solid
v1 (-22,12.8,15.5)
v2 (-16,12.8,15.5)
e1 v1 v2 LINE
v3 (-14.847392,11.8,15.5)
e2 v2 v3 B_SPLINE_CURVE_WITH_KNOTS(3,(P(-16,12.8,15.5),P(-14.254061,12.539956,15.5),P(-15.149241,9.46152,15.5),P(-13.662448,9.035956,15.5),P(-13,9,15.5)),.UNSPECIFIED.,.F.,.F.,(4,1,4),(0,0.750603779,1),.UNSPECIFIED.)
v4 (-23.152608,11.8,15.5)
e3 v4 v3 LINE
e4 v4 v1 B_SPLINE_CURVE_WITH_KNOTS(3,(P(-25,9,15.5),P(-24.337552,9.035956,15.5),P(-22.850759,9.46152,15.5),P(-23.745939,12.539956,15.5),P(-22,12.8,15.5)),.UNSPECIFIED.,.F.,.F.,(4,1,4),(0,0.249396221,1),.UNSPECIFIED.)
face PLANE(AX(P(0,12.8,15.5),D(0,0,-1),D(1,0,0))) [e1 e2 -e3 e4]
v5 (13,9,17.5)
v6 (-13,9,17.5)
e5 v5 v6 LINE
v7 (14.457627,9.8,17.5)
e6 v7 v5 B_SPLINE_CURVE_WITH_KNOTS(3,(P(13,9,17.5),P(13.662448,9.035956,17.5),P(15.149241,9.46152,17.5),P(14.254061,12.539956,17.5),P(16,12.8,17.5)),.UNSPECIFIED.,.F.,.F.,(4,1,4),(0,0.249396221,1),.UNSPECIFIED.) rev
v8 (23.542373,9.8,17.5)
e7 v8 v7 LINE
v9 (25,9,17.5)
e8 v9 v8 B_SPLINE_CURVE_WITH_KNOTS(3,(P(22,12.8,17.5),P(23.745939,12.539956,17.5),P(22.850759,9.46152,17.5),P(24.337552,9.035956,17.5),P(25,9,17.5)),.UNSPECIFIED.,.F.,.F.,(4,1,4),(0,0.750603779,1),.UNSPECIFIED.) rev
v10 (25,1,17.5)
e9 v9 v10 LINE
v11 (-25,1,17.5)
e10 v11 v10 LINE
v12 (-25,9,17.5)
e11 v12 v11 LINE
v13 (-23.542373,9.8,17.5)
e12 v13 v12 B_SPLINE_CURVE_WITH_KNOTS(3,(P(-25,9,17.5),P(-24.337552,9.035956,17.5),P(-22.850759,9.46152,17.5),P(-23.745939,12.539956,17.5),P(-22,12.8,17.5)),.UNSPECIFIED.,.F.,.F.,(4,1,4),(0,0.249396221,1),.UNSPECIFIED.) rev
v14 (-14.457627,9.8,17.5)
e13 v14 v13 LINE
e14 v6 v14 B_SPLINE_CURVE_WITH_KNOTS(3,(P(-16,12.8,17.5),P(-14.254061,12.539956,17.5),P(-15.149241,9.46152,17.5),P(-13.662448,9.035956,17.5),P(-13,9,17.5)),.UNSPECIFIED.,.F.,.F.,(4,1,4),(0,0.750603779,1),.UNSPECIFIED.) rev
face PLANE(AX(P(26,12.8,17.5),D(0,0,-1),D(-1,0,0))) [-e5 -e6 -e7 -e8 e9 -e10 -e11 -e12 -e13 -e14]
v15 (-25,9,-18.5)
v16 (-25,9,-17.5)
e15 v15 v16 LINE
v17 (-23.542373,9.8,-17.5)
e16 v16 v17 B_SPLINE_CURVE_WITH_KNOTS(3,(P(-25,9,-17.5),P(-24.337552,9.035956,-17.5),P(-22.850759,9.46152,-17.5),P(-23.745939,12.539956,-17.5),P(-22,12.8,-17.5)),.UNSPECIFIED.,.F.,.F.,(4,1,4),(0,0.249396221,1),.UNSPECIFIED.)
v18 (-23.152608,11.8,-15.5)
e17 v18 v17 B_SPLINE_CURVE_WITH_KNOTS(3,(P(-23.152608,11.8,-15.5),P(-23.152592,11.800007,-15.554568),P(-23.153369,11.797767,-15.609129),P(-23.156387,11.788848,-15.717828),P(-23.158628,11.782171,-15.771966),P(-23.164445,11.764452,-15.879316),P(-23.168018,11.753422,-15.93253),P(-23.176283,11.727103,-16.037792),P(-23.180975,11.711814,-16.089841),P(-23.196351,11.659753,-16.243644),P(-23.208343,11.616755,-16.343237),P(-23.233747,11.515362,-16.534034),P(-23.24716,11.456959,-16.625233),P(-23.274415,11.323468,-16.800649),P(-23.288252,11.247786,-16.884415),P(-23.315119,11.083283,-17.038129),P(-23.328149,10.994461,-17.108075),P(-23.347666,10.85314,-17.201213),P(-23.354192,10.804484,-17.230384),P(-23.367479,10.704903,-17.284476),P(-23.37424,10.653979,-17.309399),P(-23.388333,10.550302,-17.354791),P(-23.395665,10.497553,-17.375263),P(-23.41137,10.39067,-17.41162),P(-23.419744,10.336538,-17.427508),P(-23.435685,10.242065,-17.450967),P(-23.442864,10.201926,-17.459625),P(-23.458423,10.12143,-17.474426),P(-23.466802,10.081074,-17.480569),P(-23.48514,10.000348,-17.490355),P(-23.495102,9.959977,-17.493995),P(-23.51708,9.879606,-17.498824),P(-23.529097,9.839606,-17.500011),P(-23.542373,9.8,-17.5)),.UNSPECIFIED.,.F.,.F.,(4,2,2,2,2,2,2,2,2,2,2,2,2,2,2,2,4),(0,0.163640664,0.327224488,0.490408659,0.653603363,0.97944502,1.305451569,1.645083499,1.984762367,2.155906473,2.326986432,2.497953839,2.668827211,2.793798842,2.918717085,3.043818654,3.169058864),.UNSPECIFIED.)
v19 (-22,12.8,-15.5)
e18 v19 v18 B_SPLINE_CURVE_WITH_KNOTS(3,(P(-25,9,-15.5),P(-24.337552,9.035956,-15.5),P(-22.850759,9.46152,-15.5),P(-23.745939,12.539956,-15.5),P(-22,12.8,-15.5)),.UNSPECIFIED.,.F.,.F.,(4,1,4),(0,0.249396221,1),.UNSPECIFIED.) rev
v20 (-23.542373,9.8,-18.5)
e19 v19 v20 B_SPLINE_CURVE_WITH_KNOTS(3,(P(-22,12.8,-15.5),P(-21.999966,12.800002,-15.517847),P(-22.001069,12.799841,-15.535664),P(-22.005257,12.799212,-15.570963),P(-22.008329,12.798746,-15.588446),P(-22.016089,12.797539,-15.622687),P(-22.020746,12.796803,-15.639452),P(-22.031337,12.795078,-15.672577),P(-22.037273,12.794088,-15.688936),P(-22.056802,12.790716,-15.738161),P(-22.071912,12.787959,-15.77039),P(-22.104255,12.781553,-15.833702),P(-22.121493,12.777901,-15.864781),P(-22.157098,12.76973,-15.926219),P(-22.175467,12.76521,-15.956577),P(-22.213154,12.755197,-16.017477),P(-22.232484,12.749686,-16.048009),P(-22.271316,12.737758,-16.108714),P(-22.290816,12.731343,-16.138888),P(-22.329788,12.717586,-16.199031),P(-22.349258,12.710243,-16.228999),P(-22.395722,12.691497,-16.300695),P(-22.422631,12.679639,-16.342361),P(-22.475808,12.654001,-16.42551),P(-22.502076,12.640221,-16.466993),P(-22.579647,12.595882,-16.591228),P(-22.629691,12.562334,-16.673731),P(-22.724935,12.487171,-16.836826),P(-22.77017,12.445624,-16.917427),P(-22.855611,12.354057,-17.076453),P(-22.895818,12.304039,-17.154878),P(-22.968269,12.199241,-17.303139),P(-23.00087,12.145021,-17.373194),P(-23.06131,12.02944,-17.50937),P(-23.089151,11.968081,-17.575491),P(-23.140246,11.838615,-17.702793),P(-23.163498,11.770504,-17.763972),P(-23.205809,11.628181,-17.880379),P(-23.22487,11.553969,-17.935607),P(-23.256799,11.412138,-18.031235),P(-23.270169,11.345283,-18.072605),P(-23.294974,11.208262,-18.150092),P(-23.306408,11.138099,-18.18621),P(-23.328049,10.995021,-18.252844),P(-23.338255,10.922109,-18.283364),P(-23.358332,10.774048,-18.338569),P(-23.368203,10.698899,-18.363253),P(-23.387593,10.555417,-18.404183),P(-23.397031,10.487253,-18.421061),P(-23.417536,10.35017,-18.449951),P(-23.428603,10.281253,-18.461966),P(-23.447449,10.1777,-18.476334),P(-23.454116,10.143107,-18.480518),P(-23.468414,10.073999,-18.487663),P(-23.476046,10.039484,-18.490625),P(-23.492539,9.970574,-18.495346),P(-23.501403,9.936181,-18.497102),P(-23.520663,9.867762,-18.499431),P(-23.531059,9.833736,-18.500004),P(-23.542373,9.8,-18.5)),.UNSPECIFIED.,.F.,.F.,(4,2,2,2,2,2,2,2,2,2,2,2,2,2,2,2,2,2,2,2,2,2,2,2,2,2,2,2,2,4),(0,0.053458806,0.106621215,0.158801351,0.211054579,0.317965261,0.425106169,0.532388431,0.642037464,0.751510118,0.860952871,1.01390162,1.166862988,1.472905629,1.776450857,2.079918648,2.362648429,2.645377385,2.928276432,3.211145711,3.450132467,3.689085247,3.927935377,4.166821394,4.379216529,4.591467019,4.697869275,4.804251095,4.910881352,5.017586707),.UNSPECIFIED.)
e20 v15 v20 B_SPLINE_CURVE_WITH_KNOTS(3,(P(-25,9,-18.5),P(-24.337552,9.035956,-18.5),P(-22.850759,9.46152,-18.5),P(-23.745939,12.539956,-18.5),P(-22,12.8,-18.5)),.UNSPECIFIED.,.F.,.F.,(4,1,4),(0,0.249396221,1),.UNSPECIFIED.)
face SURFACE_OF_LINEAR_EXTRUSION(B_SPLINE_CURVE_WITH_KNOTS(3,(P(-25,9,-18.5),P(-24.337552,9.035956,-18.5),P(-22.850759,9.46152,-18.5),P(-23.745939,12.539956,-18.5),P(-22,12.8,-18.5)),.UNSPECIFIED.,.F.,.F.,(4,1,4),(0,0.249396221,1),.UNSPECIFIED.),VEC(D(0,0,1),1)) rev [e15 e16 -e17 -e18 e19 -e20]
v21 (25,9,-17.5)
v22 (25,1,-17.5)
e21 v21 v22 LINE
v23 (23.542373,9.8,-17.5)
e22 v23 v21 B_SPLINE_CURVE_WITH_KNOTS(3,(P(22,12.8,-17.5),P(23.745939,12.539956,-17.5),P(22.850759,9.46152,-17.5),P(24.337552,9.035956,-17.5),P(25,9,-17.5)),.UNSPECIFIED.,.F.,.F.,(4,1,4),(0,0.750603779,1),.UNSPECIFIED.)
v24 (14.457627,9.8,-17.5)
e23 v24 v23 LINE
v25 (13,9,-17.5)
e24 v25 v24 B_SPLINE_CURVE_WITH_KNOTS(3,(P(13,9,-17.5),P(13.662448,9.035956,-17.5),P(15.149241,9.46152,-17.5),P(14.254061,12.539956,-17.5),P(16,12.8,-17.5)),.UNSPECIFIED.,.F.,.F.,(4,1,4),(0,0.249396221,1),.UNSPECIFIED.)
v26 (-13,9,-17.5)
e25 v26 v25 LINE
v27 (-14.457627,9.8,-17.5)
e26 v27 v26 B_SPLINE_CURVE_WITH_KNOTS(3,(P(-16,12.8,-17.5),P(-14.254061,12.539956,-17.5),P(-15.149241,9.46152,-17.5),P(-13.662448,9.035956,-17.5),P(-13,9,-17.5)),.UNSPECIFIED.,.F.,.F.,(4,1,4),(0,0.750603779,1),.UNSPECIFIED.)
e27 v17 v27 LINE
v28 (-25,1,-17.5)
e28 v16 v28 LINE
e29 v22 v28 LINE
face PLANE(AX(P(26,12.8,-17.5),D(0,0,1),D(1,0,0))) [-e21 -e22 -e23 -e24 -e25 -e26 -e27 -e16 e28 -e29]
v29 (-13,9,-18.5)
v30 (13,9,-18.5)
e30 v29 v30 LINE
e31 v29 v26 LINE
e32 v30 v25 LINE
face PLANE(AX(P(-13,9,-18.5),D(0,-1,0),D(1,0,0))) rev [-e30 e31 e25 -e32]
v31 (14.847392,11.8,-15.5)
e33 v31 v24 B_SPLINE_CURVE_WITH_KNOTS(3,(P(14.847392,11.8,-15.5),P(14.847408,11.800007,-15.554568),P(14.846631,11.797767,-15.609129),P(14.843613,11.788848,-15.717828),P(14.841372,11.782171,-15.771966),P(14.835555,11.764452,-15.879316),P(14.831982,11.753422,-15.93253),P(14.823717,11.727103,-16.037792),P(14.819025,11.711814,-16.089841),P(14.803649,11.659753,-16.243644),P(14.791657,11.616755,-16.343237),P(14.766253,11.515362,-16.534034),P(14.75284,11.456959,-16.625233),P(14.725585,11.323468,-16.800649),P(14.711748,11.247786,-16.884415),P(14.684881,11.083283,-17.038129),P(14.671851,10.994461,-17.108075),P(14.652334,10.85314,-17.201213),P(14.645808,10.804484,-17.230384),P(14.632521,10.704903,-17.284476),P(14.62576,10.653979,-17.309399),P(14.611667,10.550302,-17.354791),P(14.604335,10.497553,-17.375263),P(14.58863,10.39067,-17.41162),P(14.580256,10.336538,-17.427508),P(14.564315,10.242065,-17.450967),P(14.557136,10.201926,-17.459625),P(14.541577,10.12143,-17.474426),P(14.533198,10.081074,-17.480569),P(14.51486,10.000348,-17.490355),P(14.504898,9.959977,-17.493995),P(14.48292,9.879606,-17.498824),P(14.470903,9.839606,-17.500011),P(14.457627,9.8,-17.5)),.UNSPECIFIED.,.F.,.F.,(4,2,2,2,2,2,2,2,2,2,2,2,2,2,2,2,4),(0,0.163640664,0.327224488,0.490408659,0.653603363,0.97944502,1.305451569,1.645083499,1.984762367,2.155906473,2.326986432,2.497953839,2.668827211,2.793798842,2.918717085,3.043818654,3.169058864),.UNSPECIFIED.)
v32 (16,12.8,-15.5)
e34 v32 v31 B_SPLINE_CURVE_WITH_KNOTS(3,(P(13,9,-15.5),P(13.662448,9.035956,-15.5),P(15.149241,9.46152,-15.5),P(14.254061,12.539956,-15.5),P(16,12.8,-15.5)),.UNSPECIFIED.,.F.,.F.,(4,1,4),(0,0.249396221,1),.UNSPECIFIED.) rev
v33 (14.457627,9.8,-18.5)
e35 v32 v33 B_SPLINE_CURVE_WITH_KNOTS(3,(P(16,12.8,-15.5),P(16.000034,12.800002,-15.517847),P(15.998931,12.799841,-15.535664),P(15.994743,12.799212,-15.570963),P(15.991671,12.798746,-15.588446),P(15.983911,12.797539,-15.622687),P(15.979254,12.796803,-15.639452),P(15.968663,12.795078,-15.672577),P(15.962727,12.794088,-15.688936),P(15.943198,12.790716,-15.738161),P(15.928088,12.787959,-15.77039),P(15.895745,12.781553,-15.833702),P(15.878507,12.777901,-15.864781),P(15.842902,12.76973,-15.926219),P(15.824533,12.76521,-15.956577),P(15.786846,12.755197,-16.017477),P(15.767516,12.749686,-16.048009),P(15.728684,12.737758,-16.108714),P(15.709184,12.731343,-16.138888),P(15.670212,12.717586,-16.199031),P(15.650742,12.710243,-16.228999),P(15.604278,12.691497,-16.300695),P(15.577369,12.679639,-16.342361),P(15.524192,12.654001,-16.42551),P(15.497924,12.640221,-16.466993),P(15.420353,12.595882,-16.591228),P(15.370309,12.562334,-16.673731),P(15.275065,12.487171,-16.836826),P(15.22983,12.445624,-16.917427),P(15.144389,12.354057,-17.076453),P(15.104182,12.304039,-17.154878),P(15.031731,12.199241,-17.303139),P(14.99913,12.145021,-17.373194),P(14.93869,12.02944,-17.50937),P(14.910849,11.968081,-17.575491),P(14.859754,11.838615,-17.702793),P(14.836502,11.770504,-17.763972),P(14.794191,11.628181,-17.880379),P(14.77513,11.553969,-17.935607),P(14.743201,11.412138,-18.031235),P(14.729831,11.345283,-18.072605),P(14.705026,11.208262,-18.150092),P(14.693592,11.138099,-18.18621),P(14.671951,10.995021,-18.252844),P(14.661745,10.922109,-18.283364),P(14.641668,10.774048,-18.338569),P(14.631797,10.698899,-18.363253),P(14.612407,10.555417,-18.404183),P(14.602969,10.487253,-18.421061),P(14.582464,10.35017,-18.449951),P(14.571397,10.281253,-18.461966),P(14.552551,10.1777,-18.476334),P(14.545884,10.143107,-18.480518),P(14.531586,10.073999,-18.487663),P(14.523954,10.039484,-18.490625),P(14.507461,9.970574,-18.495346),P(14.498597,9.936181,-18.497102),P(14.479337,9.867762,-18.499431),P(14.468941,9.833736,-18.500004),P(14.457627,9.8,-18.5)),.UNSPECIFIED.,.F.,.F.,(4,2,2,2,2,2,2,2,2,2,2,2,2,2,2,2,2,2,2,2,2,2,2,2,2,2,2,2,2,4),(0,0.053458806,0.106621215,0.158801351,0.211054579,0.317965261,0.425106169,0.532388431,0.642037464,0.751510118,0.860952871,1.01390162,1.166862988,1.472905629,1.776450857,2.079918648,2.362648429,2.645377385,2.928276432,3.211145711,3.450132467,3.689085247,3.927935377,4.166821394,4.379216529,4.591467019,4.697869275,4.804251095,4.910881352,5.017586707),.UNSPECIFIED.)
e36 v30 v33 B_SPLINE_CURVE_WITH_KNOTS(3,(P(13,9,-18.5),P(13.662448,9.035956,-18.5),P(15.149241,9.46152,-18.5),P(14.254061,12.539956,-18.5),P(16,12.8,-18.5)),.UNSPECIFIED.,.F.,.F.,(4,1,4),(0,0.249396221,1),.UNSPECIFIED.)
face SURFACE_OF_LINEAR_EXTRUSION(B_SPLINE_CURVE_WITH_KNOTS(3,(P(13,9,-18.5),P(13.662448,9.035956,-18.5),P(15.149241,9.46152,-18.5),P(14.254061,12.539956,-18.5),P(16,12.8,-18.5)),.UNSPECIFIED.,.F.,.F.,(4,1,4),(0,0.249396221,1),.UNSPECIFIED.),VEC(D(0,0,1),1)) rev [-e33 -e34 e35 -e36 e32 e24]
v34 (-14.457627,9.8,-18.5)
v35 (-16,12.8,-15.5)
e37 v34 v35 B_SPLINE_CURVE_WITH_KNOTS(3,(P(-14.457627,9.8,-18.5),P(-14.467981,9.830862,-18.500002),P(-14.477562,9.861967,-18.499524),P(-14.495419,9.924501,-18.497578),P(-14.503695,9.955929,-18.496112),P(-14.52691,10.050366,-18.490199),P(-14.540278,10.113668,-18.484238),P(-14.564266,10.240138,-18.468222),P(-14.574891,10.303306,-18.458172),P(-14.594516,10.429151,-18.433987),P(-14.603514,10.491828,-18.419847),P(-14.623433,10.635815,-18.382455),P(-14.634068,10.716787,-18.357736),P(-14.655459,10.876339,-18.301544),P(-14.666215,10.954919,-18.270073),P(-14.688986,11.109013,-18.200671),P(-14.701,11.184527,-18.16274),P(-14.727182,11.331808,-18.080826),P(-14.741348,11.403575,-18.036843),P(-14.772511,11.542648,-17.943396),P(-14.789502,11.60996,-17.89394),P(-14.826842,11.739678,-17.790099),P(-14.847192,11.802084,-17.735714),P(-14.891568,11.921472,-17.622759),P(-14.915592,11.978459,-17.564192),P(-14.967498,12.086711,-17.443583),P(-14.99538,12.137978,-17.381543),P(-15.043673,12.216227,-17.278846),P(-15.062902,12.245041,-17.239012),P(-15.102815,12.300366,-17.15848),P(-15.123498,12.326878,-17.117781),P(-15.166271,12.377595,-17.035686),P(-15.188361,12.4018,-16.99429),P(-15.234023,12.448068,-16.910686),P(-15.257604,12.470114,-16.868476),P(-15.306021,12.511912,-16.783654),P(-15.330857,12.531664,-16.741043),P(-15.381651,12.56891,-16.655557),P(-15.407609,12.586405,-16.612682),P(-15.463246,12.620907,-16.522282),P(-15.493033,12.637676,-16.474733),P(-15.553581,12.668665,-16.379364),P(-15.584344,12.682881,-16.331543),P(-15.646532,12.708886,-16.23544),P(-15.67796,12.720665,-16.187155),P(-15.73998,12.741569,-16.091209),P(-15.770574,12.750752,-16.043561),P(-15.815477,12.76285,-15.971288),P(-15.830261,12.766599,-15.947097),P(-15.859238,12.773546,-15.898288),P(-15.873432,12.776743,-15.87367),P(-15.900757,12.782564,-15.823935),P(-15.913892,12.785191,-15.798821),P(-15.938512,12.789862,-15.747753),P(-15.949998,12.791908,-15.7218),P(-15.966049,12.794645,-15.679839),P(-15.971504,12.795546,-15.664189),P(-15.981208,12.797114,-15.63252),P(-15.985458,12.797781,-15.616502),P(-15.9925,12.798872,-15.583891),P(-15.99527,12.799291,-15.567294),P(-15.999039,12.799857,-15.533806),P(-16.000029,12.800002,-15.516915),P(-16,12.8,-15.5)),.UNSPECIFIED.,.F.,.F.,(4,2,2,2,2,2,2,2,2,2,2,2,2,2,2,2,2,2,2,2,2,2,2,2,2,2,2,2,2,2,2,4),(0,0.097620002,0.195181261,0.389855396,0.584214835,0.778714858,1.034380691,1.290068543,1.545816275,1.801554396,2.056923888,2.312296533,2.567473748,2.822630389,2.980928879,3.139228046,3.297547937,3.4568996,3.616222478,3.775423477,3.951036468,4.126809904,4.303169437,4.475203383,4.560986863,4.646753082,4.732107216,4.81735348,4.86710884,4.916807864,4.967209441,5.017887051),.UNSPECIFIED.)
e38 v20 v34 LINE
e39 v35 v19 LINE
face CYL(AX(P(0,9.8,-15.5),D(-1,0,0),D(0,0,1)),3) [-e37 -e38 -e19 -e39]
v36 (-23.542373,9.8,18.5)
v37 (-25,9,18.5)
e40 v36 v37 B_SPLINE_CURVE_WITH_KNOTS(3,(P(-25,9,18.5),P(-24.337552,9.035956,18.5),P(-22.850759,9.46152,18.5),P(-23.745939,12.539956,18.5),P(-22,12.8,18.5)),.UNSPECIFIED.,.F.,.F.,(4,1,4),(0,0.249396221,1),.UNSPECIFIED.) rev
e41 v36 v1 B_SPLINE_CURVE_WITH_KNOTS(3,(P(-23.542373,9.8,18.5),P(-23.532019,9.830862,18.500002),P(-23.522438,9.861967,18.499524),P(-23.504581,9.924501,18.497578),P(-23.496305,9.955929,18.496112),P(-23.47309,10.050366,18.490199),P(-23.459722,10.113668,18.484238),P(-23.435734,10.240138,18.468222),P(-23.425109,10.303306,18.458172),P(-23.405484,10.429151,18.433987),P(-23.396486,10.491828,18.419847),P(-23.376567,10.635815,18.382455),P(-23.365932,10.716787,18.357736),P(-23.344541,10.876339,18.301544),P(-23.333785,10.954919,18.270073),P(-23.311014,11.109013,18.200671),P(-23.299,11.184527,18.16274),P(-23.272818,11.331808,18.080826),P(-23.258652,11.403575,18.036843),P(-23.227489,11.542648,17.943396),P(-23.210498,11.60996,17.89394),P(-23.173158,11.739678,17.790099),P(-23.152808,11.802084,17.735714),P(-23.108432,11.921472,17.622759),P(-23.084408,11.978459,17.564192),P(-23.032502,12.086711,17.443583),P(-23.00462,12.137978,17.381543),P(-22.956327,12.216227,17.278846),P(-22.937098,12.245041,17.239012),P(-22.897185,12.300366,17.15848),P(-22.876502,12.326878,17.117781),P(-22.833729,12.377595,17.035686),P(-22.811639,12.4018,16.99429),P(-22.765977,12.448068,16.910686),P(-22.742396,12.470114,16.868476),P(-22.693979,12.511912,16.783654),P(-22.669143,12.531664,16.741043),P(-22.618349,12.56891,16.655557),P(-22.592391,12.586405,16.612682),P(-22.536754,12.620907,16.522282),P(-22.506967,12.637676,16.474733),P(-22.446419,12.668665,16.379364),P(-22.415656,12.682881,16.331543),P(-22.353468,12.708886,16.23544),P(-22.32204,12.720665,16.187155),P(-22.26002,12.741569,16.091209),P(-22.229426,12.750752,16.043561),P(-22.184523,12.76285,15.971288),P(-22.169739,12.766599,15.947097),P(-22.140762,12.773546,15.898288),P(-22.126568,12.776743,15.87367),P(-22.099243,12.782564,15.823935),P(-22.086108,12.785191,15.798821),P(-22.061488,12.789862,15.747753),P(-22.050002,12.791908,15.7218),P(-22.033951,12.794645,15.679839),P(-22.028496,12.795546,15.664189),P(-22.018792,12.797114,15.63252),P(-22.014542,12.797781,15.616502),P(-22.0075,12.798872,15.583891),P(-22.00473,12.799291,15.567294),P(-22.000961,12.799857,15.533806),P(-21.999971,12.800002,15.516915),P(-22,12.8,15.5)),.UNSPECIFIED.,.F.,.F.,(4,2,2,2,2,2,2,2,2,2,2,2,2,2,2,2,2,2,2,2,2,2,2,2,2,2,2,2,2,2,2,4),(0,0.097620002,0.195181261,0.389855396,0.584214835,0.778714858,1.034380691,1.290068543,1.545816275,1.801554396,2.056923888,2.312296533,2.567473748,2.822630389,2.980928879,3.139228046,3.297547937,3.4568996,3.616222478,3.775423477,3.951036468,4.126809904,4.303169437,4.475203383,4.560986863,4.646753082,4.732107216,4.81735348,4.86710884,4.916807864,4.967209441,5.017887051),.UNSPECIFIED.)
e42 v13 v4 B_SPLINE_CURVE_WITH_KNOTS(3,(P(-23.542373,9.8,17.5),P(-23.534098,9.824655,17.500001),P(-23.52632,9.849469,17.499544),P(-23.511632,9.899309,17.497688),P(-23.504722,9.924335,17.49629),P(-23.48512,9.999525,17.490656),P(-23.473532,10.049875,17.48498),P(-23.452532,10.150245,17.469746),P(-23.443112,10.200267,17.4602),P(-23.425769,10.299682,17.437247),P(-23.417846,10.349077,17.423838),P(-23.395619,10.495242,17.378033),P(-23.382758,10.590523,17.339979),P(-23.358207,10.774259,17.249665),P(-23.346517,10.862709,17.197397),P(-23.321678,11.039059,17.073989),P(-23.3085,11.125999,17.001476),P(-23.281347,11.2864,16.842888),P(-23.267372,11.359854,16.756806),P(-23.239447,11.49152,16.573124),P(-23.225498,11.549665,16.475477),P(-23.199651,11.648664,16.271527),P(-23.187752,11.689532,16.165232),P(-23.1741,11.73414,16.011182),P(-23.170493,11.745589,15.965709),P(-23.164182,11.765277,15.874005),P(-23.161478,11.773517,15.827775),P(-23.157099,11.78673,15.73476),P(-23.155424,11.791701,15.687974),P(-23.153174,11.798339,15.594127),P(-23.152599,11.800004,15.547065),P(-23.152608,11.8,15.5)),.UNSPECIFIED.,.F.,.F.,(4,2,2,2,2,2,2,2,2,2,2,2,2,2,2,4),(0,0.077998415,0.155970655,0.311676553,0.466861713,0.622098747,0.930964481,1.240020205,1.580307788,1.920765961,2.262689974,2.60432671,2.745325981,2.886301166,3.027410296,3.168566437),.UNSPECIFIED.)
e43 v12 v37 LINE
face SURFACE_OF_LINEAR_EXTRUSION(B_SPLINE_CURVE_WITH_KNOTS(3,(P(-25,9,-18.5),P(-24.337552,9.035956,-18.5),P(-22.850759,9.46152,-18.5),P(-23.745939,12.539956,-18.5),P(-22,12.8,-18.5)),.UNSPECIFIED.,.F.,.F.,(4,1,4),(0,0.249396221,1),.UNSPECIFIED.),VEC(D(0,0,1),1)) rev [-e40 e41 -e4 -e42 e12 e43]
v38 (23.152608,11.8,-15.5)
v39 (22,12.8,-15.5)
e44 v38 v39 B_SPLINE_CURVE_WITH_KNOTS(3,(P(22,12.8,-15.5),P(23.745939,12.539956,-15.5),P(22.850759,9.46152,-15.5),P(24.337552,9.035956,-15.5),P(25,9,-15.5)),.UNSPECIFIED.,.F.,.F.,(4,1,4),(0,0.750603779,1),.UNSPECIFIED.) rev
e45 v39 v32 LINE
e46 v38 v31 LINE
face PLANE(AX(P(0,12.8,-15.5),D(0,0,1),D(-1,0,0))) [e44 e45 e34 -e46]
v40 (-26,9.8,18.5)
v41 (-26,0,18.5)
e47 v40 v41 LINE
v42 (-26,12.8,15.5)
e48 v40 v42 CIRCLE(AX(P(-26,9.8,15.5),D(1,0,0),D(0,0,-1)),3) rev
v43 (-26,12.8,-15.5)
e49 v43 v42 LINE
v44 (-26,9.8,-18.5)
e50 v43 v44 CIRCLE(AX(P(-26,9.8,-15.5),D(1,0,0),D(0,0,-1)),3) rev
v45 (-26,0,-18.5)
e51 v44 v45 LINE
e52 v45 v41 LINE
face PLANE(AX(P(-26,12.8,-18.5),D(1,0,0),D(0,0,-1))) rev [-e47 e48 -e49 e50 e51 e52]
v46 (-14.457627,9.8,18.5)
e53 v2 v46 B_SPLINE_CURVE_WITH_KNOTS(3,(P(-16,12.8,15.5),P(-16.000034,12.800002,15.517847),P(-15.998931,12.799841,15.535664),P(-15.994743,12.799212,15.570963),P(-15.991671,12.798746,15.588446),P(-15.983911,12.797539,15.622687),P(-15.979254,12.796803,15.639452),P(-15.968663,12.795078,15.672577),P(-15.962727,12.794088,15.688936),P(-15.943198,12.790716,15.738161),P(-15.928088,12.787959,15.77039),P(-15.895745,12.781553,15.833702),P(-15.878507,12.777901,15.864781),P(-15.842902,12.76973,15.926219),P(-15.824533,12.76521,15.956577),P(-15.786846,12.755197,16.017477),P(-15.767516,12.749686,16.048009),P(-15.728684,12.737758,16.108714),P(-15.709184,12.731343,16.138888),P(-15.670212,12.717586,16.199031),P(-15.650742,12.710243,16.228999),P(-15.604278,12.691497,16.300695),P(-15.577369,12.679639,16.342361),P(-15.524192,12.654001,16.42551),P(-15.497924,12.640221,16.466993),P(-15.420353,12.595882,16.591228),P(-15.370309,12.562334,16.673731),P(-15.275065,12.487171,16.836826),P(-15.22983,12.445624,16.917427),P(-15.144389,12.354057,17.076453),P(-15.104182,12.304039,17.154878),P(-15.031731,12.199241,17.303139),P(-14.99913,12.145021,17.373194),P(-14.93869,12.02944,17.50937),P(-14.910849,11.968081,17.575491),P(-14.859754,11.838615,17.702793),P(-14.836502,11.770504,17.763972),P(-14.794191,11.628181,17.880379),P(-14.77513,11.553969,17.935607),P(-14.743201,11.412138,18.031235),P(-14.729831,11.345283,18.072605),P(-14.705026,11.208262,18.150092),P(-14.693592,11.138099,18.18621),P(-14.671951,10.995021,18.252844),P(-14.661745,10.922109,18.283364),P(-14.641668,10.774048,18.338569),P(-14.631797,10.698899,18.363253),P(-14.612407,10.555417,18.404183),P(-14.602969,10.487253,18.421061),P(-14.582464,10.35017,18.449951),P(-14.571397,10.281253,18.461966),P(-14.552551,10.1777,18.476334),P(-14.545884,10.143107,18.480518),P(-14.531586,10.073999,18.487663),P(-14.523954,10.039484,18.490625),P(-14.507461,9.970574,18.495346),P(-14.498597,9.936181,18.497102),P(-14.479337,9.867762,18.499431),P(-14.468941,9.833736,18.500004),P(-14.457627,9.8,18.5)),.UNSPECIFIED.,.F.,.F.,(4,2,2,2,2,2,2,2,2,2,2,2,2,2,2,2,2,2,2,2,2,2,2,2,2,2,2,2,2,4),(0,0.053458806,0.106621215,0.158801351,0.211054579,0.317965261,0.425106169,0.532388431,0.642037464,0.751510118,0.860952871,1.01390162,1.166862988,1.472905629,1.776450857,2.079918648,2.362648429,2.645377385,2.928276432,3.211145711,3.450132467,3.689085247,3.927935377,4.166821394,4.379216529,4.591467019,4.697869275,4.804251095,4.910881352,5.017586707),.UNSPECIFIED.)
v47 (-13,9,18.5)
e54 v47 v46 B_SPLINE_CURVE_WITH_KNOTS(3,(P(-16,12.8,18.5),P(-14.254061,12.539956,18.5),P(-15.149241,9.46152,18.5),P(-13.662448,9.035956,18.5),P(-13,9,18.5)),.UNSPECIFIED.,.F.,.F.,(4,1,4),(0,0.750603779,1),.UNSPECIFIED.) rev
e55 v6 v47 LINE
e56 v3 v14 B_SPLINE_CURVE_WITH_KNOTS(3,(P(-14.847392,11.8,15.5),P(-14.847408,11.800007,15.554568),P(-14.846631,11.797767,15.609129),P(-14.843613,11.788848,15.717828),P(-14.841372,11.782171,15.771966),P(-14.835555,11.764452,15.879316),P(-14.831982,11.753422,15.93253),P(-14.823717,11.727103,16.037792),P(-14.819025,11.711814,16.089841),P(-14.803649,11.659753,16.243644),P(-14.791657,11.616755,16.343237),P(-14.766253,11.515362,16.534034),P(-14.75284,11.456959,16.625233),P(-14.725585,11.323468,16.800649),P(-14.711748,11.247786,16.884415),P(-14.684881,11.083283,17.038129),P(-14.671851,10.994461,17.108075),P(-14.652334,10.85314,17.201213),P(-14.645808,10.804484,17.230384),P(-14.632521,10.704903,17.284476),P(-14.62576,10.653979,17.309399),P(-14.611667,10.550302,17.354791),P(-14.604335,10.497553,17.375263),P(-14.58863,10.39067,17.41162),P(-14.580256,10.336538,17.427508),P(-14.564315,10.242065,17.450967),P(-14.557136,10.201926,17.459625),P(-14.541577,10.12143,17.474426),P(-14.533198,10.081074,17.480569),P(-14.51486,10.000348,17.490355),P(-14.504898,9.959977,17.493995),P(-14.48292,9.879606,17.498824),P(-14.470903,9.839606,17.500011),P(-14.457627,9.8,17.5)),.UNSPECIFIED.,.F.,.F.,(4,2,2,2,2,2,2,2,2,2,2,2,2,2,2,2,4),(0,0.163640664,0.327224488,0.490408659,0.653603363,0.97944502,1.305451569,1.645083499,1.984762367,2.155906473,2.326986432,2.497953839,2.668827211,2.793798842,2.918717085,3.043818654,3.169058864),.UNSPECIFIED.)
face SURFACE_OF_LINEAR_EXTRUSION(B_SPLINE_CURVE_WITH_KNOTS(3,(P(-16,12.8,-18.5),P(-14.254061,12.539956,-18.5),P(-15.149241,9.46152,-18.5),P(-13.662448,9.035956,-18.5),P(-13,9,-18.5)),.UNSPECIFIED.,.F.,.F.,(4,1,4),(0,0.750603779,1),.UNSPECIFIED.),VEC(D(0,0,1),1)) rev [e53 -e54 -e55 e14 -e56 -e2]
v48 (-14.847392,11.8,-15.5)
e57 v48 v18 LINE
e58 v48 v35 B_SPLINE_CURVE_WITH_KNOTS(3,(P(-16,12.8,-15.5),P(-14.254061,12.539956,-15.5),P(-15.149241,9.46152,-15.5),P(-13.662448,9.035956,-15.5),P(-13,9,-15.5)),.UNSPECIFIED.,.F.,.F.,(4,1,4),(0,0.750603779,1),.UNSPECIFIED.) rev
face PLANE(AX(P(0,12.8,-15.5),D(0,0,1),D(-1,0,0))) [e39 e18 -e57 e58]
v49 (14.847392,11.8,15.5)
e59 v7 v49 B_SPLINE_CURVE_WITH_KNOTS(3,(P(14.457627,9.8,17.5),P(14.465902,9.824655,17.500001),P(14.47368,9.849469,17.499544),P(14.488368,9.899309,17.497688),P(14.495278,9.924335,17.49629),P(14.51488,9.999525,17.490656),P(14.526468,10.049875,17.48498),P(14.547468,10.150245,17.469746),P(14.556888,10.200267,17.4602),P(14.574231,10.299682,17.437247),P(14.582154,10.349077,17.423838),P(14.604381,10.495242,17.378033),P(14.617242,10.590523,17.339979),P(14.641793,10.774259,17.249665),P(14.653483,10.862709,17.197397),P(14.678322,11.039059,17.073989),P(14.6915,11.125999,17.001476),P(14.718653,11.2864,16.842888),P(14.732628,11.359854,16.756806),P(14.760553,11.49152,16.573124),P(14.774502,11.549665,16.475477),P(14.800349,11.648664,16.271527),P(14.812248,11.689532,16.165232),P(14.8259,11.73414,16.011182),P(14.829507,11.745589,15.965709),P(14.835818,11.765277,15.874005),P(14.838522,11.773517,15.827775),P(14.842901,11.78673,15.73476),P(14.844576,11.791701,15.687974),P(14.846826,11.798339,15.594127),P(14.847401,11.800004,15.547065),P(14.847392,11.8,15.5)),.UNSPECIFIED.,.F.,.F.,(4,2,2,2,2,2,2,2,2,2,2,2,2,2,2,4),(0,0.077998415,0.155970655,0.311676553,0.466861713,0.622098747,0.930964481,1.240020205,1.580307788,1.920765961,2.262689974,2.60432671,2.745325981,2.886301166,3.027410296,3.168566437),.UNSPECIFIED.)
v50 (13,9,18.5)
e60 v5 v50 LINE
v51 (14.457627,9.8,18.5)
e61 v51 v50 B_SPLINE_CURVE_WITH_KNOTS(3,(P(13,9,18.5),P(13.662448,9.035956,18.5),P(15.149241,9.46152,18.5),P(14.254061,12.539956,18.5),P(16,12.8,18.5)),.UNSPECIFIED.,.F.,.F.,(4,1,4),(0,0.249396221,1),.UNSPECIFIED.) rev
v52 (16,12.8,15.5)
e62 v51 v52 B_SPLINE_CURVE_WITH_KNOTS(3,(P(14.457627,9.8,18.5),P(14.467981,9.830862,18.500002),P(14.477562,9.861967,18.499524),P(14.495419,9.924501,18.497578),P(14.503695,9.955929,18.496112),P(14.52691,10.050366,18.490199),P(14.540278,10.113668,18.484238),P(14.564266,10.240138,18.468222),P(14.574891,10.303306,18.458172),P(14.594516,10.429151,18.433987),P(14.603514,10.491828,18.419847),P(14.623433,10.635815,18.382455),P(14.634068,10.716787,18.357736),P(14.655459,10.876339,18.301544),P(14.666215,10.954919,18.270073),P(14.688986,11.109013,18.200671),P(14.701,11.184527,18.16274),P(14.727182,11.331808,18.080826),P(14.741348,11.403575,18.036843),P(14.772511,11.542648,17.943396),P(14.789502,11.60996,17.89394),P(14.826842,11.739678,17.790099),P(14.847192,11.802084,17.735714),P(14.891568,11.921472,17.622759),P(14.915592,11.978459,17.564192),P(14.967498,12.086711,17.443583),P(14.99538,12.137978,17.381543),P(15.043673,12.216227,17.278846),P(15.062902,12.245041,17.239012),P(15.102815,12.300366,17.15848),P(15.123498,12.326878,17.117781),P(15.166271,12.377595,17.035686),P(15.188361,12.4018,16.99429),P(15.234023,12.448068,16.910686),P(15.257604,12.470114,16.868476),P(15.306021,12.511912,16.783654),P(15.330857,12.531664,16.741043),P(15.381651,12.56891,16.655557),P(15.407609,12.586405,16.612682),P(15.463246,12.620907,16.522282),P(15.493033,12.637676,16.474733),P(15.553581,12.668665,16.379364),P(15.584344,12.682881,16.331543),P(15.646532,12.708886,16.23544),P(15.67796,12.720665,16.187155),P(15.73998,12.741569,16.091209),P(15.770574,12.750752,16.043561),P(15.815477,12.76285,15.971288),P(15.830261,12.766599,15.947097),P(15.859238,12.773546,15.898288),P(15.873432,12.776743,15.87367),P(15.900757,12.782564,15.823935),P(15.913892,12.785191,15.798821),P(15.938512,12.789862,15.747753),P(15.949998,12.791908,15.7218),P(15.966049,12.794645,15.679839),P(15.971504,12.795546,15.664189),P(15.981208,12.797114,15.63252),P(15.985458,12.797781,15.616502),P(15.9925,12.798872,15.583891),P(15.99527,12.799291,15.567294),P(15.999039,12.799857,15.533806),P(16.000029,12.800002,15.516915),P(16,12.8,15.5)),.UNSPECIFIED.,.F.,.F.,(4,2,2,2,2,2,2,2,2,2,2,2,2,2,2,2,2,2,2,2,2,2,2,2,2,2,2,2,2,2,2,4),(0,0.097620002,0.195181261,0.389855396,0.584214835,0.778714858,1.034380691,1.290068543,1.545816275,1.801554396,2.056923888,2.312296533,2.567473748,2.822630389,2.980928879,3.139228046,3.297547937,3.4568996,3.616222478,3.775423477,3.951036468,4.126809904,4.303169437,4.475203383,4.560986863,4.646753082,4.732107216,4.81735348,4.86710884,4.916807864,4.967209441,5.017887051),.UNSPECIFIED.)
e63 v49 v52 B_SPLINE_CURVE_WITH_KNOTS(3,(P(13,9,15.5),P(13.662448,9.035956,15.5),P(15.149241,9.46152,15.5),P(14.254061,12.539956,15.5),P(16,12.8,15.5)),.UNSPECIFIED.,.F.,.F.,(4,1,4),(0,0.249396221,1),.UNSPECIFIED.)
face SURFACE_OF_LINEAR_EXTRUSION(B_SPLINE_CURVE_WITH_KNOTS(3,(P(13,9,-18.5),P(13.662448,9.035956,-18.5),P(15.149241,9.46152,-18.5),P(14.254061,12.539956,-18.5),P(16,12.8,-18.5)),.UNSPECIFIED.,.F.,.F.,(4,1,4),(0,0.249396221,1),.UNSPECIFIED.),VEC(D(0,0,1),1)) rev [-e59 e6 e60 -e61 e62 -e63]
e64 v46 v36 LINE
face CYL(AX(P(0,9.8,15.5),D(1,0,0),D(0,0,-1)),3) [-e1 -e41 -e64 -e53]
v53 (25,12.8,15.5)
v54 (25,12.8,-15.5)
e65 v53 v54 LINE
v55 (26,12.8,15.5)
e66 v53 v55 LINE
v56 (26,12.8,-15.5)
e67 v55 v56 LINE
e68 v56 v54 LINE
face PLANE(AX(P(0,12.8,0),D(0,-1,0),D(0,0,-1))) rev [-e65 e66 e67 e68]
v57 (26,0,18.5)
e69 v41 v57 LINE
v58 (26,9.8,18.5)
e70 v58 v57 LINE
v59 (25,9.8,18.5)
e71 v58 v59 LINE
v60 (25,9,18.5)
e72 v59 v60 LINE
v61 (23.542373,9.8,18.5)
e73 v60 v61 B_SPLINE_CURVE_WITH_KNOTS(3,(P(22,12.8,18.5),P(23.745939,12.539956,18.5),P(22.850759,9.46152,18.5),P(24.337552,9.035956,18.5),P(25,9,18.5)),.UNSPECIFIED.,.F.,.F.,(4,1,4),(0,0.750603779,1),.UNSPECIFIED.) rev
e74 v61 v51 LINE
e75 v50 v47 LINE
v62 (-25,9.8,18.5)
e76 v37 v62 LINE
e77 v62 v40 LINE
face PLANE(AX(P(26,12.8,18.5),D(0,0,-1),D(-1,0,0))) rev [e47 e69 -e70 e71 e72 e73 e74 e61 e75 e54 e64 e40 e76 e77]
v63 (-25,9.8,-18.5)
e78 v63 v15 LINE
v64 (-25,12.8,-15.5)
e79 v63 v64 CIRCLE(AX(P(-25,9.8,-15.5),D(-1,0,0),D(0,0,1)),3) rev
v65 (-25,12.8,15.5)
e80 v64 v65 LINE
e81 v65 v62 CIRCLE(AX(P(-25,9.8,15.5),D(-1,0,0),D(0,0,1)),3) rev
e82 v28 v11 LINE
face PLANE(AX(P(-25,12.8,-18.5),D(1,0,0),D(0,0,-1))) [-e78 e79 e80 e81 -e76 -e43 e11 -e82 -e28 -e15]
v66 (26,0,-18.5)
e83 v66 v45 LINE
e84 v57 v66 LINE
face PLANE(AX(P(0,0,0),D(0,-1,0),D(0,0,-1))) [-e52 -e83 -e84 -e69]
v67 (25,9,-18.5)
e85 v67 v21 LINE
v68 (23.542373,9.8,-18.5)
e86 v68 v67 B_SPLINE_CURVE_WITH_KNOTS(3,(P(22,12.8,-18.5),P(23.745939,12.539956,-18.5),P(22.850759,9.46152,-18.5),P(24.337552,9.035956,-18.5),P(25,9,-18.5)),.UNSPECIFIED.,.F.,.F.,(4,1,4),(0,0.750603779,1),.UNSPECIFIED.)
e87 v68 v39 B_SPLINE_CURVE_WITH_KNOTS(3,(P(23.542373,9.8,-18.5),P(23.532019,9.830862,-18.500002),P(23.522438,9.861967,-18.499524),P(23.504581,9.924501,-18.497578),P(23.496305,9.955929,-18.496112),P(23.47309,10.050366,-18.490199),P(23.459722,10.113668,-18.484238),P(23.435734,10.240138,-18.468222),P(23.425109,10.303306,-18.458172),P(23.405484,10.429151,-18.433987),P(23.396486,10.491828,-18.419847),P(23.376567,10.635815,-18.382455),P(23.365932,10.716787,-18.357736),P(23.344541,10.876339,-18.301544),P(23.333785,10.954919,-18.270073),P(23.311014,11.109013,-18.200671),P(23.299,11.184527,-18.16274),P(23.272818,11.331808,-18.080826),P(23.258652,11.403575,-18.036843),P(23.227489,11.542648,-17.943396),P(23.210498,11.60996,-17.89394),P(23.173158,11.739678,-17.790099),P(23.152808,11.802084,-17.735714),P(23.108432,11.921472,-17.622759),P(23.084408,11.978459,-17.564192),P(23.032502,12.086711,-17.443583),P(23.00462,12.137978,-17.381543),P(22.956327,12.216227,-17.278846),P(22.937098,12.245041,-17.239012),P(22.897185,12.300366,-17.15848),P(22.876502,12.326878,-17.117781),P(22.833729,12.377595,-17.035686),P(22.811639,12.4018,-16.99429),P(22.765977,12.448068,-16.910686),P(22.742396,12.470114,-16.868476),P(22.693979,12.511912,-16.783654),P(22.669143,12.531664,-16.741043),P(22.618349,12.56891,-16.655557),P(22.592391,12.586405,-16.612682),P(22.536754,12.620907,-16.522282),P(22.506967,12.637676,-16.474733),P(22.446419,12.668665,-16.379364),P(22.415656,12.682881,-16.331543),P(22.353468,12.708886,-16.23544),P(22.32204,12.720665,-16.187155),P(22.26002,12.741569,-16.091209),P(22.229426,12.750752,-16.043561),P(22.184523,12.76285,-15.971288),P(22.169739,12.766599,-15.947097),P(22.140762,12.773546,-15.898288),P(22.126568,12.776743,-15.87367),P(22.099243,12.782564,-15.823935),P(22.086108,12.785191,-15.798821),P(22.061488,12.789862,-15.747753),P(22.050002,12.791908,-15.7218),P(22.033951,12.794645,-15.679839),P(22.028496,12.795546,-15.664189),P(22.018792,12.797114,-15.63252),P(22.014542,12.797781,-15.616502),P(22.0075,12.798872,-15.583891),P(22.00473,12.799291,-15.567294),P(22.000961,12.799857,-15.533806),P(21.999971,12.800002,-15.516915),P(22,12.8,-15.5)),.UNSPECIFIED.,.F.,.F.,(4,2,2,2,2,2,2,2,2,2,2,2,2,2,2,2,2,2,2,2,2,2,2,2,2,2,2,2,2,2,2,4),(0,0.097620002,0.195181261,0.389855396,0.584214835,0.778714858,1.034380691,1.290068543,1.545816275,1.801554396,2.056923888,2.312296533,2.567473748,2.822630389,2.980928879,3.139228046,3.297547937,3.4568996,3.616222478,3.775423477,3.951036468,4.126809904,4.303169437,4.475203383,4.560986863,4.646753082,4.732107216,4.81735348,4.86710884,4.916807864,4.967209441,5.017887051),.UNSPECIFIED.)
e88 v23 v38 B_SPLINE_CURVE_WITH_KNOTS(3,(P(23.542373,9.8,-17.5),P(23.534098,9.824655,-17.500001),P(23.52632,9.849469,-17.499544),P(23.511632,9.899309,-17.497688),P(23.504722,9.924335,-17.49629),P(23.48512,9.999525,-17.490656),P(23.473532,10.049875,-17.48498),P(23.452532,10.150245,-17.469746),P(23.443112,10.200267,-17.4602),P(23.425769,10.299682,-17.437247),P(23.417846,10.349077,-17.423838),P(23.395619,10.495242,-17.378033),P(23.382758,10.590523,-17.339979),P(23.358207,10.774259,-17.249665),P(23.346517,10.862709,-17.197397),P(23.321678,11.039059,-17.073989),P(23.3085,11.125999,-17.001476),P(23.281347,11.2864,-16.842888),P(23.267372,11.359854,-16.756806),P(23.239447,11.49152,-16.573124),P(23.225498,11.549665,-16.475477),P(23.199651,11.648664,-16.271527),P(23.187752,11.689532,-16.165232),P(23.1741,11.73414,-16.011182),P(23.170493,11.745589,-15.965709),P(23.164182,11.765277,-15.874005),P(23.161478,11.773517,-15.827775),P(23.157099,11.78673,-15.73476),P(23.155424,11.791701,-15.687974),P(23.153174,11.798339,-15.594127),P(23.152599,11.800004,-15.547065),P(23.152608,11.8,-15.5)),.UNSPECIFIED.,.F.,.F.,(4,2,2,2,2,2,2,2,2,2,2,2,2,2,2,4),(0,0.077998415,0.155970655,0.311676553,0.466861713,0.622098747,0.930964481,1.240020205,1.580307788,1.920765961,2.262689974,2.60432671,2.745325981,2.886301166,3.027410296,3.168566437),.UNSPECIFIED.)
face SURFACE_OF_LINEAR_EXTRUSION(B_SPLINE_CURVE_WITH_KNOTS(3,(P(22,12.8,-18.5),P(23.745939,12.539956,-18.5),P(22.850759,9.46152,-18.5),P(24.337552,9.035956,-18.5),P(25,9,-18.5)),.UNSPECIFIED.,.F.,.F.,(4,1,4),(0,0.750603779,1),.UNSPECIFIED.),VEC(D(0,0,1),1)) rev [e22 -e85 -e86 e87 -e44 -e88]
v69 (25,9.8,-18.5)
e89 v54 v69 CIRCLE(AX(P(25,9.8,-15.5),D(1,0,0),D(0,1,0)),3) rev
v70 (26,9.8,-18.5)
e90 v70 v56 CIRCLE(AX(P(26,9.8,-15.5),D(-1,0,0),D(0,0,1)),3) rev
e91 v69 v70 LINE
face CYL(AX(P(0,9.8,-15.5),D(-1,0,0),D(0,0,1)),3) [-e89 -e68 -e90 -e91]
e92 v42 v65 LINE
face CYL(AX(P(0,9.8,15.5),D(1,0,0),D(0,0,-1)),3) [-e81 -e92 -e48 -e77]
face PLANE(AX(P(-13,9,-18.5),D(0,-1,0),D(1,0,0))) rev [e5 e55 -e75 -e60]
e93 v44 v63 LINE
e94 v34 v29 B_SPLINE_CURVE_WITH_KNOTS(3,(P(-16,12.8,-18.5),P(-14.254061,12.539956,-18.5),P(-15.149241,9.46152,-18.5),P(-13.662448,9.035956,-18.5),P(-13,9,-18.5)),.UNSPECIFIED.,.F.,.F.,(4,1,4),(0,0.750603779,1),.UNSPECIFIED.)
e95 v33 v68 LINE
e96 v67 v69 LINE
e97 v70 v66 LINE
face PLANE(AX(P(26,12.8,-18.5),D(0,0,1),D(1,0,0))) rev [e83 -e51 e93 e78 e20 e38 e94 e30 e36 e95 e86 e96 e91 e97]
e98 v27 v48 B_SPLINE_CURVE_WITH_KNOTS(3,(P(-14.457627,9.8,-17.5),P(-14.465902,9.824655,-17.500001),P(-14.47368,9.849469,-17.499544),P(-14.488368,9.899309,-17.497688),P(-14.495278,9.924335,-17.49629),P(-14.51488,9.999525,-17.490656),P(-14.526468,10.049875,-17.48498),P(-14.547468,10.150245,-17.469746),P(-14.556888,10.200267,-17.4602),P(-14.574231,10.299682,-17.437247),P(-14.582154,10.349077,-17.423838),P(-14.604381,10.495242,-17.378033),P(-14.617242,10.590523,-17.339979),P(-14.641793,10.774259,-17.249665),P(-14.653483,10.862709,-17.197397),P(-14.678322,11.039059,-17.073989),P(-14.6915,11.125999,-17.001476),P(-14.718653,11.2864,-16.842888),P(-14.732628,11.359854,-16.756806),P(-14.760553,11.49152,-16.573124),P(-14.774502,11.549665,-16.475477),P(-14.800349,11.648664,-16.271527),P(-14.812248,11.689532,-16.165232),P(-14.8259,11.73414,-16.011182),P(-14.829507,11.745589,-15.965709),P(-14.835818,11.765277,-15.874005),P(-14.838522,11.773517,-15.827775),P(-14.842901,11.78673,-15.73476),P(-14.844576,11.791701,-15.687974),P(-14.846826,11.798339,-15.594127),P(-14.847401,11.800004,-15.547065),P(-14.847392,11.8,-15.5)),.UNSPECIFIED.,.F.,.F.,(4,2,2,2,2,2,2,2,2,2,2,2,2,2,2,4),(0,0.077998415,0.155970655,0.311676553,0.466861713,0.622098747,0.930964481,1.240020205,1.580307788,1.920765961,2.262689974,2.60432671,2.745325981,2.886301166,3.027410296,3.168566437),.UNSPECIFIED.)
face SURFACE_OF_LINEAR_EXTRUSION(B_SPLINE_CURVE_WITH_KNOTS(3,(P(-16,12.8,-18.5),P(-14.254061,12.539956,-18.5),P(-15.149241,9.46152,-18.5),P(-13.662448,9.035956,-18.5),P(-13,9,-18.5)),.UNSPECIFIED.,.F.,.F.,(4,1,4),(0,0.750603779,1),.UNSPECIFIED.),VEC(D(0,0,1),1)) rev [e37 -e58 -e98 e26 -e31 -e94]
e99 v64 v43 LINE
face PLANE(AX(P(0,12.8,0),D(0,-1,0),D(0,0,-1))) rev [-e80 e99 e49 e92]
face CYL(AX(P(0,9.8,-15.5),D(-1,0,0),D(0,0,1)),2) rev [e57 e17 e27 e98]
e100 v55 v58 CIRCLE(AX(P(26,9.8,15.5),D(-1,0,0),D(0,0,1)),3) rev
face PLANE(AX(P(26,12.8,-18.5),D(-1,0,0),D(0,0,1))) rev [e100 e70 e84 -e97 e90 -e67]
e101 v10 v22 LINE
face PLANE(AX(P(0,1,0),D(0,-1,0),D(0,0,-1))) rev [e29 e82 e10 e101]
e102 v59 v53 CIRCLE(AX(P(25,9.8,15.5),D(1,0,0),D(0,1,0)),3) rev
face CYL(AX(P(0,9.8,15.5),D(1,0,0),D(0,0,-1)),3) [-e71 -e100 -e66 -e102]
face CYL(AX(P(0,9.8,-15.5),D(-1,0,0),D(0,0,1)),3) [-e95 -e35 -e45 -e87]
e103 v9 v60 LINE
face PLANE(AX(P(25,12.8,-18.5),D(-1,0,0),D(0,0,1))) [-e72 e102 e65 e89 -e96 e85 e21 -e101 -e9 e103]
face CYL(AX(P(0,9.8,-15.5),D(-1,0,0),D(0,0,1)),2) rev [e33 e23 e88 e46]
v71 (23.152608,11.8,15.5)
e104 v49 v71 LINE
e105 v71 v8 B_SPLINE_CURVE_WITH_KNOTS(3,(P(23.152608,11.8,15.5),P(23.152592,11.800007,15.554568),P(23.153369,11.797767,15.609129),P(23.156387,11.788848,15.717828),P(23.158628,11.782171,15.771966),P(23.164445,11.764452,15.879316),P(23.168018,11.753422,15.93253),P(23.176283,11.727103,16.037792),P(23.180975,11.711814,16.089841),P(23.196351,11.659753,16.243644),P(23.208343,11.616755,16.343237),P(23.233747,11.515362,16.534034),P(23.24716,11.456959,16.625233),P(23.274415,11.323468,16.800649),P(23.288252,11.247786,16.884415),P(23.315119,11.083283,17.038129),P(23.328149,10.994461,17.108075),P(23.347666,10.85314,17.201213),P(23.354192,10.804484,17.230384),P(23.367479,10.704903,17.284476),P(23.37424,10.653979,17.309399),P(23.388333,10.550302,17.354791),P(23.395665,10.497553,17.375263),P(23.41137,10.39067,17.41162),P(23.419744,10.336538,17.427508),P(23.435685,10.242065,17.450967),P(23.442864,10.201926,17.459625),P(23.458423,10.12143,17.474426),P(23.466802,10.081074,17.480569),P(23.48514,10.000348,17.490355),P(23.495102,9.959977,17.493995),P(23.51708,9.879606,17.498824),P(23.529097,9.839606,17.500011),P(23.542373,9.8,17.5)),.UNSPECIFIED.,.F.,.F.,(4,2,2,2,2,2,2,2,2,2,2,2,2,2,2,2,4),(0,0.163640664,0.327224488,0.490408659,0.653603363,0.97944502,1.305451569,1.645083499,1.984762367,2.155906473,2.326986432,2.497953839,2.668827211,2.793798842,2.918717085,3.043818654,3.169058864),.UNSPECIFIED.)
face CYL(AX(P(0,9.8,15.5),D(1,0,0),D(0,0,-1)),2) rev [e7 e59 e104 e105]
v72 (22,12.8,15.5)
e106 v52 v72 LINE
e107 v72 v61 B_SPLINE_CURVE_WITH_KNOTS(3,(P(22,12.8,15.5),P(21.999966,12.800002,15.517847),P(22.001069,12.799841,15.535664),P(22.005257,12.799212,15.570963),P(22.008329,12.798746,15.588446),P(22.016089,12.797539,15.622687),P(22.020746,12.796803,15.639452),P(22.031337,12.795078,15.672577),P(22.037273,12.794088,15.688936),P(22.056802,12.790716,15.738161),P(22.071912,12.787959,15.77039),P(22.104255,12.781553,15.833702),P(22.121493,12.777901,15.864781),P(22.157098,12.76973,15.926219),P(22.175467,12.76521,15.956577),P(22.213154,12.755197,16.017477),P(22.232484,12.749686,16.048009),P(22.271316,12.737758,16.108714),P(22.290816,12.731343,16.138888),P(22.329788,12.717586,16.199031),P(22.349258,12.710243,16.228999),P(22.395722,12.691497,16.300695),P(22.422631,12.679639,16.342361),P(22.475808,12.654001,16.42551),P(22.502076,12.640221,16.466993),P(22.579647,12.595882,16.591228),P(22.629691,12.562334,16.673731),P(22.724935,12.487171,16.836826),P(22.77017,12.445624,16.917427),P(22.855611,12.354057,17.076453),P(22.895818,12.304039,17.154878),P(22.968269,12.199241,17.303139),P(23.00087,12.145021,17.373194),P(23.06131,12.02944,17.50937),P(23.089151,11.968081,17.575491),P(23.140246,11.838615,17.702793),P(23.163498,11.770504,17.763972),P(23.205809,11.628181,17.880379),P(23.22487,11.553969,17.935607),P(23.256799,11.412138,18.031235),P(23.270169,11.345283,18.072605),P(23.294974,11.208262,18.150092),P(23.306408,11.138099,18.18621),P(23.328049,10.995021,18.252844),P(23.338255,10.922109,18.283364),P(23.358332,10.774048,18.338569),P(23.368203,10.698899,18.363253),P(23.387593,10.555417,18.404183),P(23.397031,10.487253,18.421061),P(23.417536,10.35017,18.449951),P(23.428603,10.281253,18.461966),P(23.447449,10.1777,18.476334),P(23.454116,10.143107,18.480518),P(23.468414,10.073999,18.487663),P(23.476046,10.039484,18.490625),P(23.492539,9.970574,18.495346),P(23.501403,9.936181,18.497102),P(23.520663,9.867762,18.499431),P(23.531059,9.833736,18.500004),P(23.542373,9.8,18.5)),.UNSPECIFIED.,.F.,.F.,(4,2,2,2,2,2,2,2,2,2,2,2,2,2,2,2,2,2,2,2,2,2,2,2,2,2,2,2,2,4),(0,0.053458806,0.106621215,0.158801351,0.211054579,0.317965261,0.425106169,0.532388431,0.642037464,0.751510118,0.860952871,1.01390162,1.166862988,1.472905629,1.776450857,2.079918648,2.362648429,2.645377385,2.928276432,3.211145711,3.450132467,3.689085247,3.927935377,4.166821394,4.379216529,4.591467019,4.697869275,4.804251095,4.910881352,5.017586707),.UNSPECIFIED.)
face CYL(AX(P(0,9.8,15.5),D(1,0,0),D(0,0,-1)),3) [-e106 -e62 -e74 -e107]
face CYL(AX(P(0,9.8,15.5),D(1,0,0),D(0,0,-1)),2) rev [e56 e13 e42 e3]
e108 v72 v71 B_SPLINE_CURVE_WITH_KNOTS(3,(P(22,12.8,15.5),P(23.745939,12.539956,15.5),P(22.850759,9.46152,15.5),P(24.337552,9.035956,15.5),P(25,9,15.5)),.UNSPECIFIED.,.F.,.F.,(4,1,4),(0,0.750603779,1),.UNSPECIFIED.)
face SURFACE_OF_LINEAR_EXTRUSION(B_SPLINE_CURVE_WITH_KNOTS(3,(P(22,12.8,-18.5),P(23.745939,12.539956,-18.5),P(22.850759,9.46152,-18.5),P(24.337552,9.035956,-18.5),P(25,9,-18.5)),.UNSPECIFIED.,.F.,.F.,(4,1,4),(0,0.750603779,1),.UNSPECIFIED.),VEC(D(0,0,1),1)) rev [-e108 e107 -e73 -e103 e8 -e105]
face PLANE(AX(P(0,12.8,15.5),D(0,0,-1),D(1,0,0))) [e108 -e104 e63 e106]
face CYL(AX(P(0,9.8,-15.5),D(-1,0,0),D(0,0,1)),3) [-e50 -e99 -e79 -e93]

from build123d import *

# Parameters (mm, degrees)
SKETCH1_W               = 52
SKETCH1_H               = 37
BOSS_EXTRUDE1_DEPTH     = 12.8
FILLET1_R               = 3
SHELL2_START            = -25
SHELL2_DEPTH            = 50
CUT_EXTRUDE1_DEPTH      = 47.998297842
CUT_EXTRUDE1_DEPTH_BACK = 47.998297842


# Read off the part's stored shape, not the designer's step: Shell2
with BuildPart() as part:
    # Sketch1 → Boss-Extrude1 (new body)
    with BuildSketch(Plane(origin=(0, 0, 0), x_dir=(1, 0, 0), z_dir=(0, 1, 0))):
        Rectangle(SKETCH1_W, SKETCH1_H)
    extrude(amount=BOSS_EXTRUDE1_DEPTH)

    # Fillet1
    fillet1_edges = [part.edges().sort_by_distance(p)[0] for p in [
        (0, 12.8, -18.5),
        (0, 12.8, 18.5),
    ]]
    fillet(fillet1_edges, radius=FILLET1_R)

    # Shell2 outline → Shell2 (cut)
    with BuildSketch(Plane.YZ.offset(SHELL2_START)):
        with BuildLine():
            Line((12.8, 15.5), (11.8, 15.5))
            ThreePointArc((11.8, 15.5), (11.214213562, 16.914213562), (9.8, 17.5))
            Line((9.8, 17.5), (1, 17.5))
            Line((1, 17.5), (1, -17.5))
            Line((1, -17.5), (9.8, -17.5))
            ThreePointArc((9.8, -17.5), (11.214213562, -16.914213562), (11.8, -15.5))
            Line((11.8, -15.5), (12.8, -15.5))
            Line((12.8, -15.5), (12.8, 15.5))
        make_face()
    extrude(amount=SHELL2_DEPTH, mode=Mode.SUBTRACT)

    # Sketch2 → Cut-Extrude1 (cut, two sides: drawn at the far end of the back side and taken through both)
    with BuildSketch(Plane.XY.offset(18.5).offset(-CUT_EXTRUDE1_DEPTH_BACK)):
        with BuildLine():
            Line((-25, 9), (-25, 12.8))
            Line((-25, 12.8), (-22, 12.8))
            add(Edge.make_bspline(
                [(-25, 9), (-24.337551865, 9.035956423), (-22.850759104, 9.461520311), (-23.745938666, 12.539955656), (-22, 12.8)],
                knots=[0, 0, 0, 0, 0.249396221, 1, 1, 1, 1], degree=3))
        make_face()
        with BuildLine():
            Line((-16, 12.8), (16, 12.8))
            add(Edge.make_bspline(
                [(13, 9), (13.662448135, 9.035956423), (15.149240896, 9.461520311), (14.254061334, 12.539955656), (16, 12.8)],
                knots=[0, 0, 0, 0, 0.249396221, 1, 1, 1, 1], degree=3))
            Line((13, 9), (-13, 9))
            add(Edge.make_bspline(
                [(-13, 9), (-13.662448135, 9.035956423), (-15.149240896, 9.461520311), (-14.254061334, 12.539955656), (-16, 12.8)],
                knots=[0, 0, 0, 0, 0.249396221, 1, 1, 1, 1], degree=3))
        make_face()
        with BuildLine():
            Line((25, 9), (25, 12.8))
            Line((25, 12.8), (22, 12.8))
            add(Edge.make_bspline(
                [(25, 9), (24.337551865, 9.035956423), (22.850759104, 9.461520311), (23.745938666, 12.539955656), (22, 12.8)],
                knots=[0, 0, 0, 0, 0.249396221, 1, 1, 1, 1], degree=3))
        make_face()
    extrude(amount=CUT_EXTRUDE1_DEPTH + CUT_EXTRUDE1_DEPTH_BACK, mode=Mode.SUBTRACT)


solid = part.part
